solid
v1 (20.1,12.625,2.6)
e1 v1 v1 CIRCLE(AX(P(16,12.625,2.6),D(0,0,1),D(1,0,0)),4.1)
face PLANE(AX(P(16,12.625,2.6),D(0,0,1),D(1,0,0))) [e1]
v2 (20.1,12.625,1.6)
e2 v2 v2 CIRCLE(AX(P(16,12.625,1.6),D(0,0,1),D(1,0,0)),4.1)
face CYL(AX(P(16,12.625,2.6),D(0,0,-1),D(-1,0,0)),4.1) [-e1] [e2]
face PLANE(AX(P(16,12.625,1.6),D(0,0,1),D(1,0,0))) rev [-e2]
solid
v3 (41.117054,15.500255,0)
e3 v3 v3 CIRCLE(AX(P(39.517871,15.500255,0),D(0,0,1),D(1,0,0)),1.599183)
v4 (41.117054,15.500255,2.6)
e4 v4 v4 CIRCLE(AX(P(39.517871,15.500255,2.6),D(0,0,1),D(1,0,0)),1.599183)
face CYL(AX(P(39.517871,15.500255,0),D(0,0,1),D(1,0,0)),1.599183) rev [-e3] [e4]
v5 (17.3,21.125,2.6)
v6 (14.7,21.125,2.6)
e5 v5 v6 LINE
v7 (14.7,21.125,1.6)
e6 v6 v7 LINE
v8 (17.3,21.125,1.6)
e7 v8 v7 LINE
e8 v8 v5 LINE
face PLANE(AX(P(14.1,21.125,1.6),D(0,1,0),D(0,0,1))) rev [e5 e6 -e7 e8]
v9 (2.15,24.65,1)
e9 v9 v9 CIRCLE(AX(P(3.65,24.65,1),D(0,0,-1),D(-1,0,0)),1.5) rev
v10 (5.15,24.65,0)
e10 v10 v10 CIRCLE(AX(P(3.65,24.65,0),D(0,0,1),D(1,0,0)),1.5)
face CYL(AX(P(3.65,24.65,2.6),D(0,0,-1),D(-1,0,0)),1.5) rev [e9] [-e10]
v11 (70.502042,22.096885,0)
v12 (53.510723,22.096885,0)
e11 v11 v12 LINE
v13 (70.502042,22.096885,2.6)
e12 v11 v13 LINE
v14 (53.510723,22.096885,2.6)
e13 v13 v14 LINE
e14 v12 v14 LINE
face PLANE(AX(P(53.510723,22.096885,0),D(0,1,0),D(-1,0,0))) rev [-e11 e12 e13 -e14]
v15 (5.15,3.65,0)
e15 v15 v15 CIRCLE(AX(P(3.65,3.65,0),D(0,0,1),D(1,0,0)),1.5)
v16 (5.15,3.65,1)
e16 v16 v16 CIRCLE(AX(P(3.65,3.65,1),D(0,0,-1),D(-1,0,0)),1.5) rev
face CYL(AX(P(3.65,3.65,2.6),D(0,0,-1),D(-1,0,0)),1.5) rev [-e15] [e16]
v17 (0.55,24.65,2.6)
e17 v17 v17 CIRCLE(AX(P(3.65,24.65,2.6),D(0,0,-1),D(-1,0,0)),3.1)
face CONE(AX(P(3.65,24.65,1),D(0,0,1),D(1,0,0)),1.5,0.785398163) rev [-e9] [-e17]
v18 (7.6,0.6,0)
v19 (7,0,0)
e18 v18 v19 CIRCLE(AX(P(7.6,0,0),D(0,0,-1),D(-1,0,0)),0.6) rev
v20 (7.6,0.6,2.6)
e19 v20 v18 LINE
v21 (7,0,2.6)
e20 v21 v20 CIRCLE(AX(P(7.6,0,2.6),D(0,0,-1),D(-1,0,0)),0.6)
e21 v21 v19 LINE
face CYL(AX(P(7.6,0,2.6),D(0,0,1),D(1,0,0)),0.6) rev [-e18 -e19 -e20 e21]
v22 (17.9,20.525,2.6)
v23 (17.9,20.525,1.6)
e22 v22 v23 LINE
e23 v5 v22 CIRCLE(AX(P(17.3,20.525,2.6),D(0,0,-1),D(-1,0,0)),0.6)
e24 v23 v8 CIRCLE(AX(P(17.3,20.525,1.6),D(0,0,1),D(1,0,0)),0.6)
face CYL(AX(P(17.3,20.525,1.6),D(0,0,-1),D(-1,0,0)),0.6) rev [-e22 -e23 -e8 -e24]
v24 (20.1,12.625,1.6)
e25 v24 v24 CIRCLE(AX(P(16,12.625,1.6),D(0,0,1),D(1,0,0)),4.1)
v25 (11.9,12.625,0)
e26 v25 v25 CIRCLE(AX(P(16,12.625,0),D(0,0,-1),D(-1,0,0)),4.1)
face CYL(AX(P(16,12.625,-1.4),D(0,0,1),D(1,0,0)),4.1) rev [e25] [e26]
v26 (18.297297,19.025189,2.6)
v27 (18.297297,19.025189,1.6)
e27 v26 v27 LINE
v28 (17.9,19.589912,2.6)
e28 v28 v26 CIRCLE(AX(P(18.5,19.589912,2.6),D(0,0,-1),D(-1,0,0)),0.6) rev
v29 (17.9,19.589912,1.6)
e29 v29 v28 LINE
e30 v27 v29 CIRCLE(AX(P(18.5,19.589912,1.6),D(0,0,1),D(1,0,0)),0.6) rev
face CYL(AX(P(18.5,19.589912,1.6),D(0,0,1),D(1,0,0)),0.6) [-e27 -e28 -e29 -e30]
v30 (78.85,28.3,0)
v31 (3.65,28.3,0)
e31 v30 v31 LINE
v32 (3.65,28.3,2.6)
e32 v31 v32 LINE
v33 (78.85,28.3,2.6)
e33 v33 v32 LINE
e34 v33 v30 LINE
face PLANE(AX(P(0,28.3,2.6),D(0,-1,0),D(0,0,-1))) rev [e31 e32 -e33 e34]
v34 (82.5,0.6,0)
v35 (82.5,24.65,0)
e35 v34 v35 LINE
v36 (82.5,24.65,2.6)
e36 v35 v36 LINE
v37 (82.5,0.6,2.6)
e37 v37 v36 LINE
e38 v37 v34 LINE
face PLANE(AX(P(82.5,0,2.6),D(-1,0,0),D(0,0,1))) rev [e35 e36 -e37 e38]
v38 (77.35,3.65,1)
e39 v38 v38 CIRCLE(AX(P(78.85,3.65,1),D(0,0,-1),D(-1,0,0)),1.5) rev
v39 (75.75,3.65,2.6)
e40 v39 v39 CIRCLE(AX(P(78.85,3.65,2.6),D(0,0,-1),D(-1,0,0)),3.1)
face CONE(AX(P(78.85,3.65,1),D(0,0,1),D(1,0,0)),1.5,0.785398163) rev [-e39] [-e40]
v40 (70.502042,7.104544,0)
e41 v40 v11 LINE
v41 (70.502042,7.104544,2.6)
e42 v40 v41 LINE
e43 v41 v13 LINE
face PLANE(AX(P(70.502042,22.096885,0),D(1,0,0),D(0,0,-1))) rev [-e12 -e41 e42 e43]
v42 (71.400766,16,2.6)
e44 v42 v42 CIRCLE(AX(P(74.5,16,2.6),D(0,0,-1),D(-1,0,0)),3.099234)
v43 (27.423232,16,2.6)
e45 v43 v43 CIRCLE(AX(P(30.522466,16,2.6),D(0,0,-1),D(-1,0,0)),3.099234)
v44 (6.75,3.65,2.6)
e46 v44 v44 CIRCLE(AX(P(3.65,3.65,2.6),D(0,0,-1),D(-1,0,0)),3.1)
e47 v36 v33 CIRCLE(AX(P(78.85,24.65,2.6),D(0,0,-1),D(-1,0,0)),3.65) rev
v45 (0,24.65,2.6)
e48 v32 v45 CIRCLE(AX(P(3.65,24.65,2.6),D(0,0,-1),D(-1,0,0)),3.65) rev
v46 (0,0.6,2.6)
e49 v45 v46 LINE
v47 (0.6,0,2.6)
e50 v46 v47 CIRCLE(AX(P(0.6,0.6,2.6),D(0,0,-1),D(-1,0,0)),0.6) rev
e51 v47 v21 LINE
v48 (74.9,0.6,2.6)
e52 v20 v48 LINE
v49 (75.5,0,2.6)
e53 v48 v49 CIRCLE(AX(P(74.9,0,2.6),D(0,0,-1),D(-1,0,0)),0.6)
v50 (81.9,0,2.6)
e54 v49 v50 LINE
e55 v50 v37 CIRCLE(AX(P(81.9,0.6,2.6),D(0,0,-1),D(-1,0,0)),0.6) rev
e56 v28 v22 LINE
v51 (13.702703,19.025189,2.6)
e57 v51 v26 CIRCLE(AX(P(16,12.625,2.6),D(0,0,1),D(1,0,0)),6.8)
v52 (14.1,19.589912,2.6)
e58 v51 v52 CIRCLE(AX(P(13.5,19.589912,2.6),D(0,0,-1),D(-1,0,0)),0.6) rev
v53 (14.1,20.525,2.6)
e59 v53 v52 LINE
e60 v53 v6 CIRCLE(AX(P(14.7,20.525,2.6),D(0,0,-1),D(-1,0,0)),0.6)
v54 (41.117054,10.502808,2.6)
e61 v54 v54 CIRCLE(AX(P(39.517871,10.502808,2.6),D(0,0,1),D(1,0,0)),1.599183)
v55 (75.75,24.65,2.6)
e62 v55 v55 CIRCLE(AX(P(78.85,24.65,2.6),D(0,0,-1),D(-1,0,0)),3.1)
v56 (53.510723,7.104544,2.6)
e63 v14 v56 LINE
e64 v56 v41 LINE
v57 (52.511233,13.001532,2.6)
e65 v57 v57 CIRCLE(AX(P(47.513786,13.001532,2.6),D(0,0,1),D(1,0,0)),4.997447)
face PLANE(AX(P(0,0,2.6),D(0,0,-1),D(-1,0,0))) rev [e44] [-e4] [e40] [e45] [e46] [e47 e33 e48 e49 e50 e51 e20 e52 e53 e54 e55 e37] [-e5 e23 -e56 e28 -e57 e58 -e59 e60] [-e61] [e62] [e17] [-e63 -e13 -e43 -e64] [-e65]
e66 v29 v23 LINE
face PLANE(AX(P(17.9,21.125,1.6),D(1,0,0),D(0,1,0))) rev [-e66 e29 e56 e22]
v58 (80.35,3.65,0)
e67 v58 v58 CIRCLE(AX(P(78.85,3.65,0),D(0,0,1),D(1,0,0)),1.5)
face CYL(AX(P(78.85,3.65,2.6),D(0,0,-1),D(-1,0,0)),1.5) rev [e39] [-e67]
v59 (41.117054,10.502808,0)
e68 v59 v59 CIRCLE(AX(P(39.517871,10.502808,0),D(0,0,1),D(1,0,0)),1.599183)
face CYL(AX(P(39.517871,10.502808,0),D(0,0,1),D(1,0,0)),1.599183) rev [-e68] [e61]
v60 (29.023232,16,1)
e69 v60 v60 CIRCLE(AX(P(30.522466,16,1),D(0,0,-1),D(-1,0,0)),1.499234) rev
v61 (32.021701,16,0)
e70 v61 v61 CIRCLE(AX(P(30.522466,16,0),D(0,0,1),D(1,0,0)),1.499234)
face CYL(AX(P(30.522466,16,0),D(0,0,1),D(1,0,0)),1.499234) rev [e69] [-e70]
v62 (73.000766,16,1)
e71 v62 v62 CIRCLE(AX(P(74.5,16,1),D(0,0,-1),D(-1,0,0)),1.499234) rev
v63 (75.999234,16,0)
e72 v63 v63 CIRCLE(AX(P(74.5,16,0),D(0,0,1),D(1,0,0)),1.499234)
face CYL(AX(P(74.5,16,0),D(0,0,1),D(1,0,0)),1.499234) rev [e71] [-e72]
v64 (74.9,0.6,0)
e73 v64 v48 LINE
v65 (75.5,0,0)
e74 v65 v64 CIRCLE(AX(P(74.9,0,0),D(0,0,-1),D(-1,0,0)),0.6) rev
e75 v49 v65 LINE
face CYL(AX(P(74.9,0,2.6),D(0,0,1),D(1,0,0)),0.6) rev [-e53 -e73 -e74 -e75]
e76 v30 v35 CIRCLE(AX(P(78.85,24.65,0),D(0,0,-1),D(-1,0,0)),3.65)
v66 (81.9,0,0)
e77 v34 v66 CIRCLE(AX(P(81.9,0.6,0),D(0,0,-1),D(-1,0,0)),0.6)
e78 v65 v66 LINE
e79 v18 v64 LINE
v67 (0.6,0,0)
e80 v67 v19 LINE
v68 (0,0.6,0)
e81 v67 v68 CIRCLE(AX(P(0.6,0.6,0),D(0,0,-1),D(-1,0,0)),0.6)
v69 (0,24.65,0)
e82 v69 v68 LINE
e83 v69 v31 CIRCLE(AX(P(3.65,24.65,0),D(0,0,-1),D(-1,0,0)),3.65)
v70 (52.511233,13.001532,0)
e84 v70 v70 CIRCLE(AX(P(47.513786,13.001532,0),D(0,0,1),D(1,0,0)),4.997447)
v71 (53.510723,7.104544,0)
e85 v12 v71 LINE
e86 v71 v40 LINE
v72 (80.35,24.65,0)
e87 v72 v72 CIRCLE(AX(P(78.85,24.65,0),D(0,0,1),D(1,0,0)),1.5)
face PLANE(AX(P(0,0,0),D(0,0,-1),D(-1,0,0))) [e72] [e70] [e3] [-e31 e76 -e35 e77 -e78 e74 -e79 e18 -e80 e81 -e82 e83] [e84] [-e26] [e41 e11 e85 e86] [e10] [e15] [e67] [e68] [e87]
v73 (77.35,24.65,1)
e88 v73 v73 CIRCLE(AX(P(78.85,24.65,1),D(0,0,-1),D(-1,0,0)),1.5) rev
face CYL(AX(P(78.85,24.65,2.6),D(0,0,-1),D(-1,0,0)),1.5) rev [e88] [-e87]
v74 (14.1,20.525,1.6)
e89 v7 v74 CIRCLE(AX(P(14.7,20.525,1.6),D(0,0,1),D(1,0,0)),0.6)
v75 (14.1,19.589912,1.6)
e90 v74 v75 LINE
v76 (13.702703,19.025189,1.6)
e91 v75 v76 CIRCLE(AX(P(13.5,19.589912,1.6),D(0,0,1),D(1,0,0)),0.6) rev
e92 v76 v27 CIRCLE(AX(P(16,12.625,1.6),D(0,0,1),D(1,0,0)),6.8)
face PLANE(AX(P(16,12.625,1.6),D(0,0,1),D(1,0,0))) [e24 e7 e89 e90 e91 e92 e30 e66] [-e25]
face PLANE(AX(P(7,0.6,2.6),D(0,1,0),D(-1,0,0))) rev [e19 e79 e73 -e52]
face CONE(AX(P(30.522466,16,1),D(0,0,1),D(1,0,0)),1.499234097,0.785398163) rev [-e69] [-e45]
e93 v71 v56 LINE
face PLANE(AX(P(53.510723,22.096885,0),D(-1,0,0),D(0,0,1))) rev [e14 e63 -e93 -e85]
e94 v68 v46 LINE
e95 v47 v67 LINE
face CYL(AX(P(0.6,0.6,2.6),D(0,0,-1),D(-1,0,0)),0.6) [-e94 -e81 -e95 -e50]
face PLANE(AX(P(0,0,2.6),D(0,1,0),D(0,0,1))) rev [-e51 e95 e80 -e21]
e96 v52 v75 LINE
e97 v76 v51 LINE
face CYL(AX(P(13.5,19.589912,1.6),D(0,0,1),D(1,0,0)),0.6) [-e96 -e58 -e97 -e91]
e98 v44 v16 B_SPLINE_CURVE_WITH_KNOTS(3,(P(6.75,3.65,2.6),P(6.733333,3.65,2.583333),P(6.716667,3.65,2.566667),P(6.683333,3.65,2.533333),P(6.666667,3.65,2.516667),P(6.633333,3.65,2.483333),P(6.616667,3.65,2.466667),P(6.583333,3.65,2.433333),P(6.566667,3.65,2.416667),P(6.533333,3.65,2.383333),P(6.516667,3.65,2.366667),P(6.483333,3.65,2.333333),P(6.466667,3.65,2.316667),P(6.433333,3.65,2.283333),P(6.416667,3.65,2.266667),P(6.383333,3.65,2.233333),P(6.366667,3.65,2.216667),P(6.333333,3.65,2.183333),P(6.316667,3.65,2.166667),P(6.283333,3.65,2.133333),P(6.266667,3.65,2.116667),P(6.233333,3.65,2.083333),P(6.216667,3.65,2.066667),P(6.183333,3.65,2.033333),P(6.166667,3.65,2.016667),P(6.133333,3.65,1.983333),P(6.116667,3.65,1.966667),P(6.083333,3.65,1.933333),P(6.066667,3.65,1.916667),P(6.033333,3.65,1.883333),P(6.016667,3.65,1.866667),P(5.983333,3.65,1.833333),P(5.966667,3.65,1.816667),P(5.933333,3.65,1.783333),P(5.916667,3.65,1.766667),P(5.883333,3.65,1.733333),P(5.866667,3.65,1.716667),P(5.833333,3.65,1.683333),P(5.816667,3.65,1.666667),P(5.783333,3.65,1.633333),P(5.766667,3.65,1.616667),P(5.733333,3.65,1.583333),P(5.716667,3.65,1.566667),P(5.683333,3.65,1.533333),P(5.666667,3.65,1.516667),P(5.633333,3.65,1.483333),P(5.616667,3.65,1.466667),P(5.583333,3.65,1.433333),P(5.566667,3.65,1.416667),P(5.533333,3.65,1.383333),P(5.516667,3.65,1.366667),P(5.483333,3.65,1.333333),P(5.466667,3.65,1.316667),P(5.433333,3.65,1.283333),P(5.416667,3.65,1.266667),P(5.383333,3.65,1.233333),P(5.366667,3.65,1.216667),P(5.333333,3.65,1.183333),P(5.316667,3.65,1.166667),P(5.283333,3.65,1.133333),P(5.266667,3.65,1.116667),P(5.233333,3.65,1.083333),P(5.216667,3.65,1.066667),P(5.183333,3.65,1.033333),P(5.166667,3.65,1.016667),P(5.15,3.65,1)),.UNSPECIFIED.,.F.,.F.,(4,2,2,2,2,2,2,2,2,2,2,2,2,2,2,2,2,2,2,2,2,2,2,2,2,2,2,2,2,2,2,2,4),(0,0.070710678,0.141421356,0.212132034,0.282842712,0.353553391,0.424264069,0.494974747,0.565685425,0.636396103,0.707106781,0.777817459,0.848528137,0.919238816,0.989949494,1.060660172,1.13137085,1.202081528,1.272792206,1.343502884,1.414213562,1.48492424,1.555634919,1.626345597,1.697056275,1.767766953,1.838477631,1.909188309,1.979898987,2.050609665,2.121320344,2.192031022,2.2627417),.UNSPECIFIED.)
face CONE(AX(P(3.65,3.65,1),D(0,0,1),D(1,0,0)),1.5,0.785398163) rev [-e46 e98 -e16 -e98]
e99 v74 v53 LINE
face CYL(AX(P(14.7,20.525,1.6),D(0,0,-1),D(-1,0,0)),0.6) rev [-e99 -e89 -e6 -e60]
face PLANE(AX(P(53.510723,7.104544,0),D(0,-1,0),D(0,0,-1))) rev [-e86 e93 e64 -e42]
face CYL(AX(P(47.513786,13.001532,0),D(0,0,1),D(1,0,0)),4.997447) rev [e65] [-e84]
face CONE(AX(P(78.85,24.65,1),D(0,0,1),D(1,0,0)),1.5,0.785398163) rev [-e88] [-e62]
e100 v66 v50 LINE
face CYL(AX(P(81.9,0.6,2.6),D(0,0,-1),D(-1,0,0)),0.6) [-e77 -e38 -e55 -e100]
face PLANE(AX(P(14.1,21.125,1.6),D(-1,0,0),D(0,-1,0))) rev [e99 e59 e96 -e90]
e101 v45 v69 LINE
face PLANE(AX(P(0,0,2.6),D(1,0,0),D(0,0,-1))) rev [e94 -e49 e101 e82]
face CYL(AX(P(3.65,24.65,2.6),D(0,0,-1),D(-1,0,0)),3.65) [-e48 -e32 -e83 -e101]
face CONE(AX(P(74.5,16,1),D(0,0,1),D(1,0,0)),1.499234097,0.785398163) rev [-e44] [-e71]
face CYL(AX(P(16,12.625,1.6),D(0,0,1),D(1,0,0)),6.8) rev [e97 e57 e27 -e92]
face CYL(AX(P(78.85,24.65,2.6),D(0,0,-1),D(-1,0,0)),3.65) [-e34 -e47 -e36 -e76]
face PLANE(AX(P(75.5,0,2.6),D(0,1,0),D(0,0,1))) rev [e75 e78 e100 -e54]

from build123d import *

# Parameters (mm, degrees)
SKETCH1_R           = 1.5
BOSS_EXTRUDE1_DEPTH = 2.6
FILLET1_R           = 3.65
FILLET2_R           = 0.6
CHAMFER1_SIZE       = 1.6
SKETCH2_R           = 1.499234097
SKETCH2_R_2         = 4.997446991
SKETCH2_R_3         = 1.599183037
SKETCH2_W           = 16.99131977
SKETCH2_H           = 14.992340973
CUT_EXTRUDE1_DEPTH  = 2.6
CHAMFER2_SIZE       = 1.6
SKETCH3_R           = 6.8
CUT_EXTRUDE2_DEPTH  = 1
SKETCH4_R           = 4.1
CUT_EXTRUDE3_DEPTH  = 3
SKETCH5_W           = 3.8
SKETCH5_H           = 3.391058966
CUT_EXTRUDE4_DEPTH  = 1
FILLET3_R           = 0.6
SKETCH6_R           = 4.1
BOSS_EXTRUDE3_DEPTH = 1


with BuildPart() as part:
    # Sketch1 → Boss-Extrude1 (new body)
    with BuildSketch(Plane.XY):
        Polygon((7, 0), (7, 0.6), (75.5, 0.6), (75.5, 0), (82.5, 0), (82.5, 28.3), (0, 28.3), (0, 0), align=None)
        with Locations((3.65, 24.65)):
            Circle(SKETCH1_R, mode=Mode.SUBTRACT)
        with Locations((3.65, 3.65)):
            Circle(SKETCH1_R, mode=Mode.SUBTRACT)
        with Locations((78.85, 24.65)):
            Circle(SKETCH1_R, mode=Mode.SUBTRACT)
        with Locations((78.85, 3.65)):
            Circle(SKETCH1_R, mode=Mode.SUBTRACT)
    extrude(amount=BOSS_EXTRUDE1_DEPTH)

    # Fillet1
    fillet1_edges = [part.edges().sort_by_distance(p)[0] for p in [
        (0, 28.3, 1.3),
        (82.5, 28.3, 1.3),
    ]]
    fillet(fillet1_edges, radius=FILLET1_R)

    # Fillet2
    fillet2_edges = [part.edges().sort_by_distance(p)[0] for p in [
        (75.5, 0.6, 1.3),
        (7, 0.6, 1.3),
    ]]
    fillet(fillet2_edges, radius=FILLET2_R - 0.0001)  # a hair under: the kernel refuses the full size
    fillet2_2_edges = [part.edges().sort_by_distance(p)[0] for p in [
        (82.5, 0, 1.3),
        (0, 0, 1.3),
    ]]
    fillet(fillet2_2_edges, radius=FILLET2_R)

    # Chamfer1
    chamfer1_edges = [part.edges().sort_by_distance(p)[0] for p in [
        (2.15, 24.65, 2.6),
        (2.15, 3.65, 2.6),
        (77.35, 24.65, 2.6),
        (77.35, 3.65, 2.6),
    ]]
    chamfer(chamfer1_edges, length=CHAMFER1_SIZE)

    # Sketch2 → Cut-Extrude1 (cut)
    with BuildSketch(Plane.XY.offset(2.6)):
        with Locations((74.5, 16)):
            Circle(SKETCH2_R)
        with Locations((30.522466477, 16)):
            Circle(SKETCH2_R)
        with Locations((47.513786247, 13.001531805)):
            Circle(SKETCH2_R_2)
        with Locations((39.517871061, 15.500255301)):
            Circle(SKETCH2_R_3)
        with Locations((39.517871061, 10.50280831)):
            Circle(SKETCH2_R_3)
        with Locations((62.006382522, 14.600714843)):
            Rectangle(SKETCH2_W, SKETCH2_H)
    extrude(amount=-CUT_EXTRUDE1_DEPTH, mode=Mode.SUBTRACT)

    # Chamfer2
    chamfer2_edges = [part.edges().sort_by_distance(p)[0] for p in [
        (73.000765903, 16, 2.6),
        (29.023232379, 16, 2.6),
    ]]
    chamfer(chamfer2_edges, length=CHAMFER2_SIZE)

    # Sketch3 → Cut-Extrude2 (cut)
    with BuildSketch(Plane.XY.offset(2.6)):
        with Locations((16, 12.625)):
            Circle(SKETCH3_R)
    extrude(amount=-CUT_EXTRUDE2_DEPTH, mode=Mode.SUBTRACT)

    # Sketch4 → Cut-Extrude3 (cut)
    with BuildSketch(Plane.XY.offset(1.6)):
        with Locations((16, 12.625)):
            Circle(SKETCH4_R)
    extrude(amount=-CUT_EXTRUDE3_DEPTH, mode=Mode.SUBTRACT)

    # Sketch5 → Cut-Extrude4 (cut)
    with BuildSketch(Plane.XY.offset(2.6)):
        with Locations((16, 19.429470517)):
            Rectangle(SKETCH5_W, SKETCH5_H)
    extrude(amount=-CUT_EXTRUDE4_DEPTH, mode=Mode.SUBTRACT)

    # Fillet3
    fillet3_edges = [part.edges().sort_by_distance(p)[0] for p in [
        (14.1, 19.154165337, 2.1),
        (17.9, 19.154165337, 2.1),
        (17.9, 21.125, 2.1),
        (14.1, 21.125, 2.1),
    ]]
    fillet(fillet3_edges, radius=FILLET3_R)


with BuildPart() as body_2:
    # Sketch6 → Boss-Extrude3 (new body)
    with BuildSketch(Plane.XY.offset(1.6)):
        with Locations((16, 12.625)):
            Circle(SKETCH6_R)
    extrude(amount=BOSS_EXTRUDE3_DEPTH)


solid = Compound([part.part, body_2.part])
